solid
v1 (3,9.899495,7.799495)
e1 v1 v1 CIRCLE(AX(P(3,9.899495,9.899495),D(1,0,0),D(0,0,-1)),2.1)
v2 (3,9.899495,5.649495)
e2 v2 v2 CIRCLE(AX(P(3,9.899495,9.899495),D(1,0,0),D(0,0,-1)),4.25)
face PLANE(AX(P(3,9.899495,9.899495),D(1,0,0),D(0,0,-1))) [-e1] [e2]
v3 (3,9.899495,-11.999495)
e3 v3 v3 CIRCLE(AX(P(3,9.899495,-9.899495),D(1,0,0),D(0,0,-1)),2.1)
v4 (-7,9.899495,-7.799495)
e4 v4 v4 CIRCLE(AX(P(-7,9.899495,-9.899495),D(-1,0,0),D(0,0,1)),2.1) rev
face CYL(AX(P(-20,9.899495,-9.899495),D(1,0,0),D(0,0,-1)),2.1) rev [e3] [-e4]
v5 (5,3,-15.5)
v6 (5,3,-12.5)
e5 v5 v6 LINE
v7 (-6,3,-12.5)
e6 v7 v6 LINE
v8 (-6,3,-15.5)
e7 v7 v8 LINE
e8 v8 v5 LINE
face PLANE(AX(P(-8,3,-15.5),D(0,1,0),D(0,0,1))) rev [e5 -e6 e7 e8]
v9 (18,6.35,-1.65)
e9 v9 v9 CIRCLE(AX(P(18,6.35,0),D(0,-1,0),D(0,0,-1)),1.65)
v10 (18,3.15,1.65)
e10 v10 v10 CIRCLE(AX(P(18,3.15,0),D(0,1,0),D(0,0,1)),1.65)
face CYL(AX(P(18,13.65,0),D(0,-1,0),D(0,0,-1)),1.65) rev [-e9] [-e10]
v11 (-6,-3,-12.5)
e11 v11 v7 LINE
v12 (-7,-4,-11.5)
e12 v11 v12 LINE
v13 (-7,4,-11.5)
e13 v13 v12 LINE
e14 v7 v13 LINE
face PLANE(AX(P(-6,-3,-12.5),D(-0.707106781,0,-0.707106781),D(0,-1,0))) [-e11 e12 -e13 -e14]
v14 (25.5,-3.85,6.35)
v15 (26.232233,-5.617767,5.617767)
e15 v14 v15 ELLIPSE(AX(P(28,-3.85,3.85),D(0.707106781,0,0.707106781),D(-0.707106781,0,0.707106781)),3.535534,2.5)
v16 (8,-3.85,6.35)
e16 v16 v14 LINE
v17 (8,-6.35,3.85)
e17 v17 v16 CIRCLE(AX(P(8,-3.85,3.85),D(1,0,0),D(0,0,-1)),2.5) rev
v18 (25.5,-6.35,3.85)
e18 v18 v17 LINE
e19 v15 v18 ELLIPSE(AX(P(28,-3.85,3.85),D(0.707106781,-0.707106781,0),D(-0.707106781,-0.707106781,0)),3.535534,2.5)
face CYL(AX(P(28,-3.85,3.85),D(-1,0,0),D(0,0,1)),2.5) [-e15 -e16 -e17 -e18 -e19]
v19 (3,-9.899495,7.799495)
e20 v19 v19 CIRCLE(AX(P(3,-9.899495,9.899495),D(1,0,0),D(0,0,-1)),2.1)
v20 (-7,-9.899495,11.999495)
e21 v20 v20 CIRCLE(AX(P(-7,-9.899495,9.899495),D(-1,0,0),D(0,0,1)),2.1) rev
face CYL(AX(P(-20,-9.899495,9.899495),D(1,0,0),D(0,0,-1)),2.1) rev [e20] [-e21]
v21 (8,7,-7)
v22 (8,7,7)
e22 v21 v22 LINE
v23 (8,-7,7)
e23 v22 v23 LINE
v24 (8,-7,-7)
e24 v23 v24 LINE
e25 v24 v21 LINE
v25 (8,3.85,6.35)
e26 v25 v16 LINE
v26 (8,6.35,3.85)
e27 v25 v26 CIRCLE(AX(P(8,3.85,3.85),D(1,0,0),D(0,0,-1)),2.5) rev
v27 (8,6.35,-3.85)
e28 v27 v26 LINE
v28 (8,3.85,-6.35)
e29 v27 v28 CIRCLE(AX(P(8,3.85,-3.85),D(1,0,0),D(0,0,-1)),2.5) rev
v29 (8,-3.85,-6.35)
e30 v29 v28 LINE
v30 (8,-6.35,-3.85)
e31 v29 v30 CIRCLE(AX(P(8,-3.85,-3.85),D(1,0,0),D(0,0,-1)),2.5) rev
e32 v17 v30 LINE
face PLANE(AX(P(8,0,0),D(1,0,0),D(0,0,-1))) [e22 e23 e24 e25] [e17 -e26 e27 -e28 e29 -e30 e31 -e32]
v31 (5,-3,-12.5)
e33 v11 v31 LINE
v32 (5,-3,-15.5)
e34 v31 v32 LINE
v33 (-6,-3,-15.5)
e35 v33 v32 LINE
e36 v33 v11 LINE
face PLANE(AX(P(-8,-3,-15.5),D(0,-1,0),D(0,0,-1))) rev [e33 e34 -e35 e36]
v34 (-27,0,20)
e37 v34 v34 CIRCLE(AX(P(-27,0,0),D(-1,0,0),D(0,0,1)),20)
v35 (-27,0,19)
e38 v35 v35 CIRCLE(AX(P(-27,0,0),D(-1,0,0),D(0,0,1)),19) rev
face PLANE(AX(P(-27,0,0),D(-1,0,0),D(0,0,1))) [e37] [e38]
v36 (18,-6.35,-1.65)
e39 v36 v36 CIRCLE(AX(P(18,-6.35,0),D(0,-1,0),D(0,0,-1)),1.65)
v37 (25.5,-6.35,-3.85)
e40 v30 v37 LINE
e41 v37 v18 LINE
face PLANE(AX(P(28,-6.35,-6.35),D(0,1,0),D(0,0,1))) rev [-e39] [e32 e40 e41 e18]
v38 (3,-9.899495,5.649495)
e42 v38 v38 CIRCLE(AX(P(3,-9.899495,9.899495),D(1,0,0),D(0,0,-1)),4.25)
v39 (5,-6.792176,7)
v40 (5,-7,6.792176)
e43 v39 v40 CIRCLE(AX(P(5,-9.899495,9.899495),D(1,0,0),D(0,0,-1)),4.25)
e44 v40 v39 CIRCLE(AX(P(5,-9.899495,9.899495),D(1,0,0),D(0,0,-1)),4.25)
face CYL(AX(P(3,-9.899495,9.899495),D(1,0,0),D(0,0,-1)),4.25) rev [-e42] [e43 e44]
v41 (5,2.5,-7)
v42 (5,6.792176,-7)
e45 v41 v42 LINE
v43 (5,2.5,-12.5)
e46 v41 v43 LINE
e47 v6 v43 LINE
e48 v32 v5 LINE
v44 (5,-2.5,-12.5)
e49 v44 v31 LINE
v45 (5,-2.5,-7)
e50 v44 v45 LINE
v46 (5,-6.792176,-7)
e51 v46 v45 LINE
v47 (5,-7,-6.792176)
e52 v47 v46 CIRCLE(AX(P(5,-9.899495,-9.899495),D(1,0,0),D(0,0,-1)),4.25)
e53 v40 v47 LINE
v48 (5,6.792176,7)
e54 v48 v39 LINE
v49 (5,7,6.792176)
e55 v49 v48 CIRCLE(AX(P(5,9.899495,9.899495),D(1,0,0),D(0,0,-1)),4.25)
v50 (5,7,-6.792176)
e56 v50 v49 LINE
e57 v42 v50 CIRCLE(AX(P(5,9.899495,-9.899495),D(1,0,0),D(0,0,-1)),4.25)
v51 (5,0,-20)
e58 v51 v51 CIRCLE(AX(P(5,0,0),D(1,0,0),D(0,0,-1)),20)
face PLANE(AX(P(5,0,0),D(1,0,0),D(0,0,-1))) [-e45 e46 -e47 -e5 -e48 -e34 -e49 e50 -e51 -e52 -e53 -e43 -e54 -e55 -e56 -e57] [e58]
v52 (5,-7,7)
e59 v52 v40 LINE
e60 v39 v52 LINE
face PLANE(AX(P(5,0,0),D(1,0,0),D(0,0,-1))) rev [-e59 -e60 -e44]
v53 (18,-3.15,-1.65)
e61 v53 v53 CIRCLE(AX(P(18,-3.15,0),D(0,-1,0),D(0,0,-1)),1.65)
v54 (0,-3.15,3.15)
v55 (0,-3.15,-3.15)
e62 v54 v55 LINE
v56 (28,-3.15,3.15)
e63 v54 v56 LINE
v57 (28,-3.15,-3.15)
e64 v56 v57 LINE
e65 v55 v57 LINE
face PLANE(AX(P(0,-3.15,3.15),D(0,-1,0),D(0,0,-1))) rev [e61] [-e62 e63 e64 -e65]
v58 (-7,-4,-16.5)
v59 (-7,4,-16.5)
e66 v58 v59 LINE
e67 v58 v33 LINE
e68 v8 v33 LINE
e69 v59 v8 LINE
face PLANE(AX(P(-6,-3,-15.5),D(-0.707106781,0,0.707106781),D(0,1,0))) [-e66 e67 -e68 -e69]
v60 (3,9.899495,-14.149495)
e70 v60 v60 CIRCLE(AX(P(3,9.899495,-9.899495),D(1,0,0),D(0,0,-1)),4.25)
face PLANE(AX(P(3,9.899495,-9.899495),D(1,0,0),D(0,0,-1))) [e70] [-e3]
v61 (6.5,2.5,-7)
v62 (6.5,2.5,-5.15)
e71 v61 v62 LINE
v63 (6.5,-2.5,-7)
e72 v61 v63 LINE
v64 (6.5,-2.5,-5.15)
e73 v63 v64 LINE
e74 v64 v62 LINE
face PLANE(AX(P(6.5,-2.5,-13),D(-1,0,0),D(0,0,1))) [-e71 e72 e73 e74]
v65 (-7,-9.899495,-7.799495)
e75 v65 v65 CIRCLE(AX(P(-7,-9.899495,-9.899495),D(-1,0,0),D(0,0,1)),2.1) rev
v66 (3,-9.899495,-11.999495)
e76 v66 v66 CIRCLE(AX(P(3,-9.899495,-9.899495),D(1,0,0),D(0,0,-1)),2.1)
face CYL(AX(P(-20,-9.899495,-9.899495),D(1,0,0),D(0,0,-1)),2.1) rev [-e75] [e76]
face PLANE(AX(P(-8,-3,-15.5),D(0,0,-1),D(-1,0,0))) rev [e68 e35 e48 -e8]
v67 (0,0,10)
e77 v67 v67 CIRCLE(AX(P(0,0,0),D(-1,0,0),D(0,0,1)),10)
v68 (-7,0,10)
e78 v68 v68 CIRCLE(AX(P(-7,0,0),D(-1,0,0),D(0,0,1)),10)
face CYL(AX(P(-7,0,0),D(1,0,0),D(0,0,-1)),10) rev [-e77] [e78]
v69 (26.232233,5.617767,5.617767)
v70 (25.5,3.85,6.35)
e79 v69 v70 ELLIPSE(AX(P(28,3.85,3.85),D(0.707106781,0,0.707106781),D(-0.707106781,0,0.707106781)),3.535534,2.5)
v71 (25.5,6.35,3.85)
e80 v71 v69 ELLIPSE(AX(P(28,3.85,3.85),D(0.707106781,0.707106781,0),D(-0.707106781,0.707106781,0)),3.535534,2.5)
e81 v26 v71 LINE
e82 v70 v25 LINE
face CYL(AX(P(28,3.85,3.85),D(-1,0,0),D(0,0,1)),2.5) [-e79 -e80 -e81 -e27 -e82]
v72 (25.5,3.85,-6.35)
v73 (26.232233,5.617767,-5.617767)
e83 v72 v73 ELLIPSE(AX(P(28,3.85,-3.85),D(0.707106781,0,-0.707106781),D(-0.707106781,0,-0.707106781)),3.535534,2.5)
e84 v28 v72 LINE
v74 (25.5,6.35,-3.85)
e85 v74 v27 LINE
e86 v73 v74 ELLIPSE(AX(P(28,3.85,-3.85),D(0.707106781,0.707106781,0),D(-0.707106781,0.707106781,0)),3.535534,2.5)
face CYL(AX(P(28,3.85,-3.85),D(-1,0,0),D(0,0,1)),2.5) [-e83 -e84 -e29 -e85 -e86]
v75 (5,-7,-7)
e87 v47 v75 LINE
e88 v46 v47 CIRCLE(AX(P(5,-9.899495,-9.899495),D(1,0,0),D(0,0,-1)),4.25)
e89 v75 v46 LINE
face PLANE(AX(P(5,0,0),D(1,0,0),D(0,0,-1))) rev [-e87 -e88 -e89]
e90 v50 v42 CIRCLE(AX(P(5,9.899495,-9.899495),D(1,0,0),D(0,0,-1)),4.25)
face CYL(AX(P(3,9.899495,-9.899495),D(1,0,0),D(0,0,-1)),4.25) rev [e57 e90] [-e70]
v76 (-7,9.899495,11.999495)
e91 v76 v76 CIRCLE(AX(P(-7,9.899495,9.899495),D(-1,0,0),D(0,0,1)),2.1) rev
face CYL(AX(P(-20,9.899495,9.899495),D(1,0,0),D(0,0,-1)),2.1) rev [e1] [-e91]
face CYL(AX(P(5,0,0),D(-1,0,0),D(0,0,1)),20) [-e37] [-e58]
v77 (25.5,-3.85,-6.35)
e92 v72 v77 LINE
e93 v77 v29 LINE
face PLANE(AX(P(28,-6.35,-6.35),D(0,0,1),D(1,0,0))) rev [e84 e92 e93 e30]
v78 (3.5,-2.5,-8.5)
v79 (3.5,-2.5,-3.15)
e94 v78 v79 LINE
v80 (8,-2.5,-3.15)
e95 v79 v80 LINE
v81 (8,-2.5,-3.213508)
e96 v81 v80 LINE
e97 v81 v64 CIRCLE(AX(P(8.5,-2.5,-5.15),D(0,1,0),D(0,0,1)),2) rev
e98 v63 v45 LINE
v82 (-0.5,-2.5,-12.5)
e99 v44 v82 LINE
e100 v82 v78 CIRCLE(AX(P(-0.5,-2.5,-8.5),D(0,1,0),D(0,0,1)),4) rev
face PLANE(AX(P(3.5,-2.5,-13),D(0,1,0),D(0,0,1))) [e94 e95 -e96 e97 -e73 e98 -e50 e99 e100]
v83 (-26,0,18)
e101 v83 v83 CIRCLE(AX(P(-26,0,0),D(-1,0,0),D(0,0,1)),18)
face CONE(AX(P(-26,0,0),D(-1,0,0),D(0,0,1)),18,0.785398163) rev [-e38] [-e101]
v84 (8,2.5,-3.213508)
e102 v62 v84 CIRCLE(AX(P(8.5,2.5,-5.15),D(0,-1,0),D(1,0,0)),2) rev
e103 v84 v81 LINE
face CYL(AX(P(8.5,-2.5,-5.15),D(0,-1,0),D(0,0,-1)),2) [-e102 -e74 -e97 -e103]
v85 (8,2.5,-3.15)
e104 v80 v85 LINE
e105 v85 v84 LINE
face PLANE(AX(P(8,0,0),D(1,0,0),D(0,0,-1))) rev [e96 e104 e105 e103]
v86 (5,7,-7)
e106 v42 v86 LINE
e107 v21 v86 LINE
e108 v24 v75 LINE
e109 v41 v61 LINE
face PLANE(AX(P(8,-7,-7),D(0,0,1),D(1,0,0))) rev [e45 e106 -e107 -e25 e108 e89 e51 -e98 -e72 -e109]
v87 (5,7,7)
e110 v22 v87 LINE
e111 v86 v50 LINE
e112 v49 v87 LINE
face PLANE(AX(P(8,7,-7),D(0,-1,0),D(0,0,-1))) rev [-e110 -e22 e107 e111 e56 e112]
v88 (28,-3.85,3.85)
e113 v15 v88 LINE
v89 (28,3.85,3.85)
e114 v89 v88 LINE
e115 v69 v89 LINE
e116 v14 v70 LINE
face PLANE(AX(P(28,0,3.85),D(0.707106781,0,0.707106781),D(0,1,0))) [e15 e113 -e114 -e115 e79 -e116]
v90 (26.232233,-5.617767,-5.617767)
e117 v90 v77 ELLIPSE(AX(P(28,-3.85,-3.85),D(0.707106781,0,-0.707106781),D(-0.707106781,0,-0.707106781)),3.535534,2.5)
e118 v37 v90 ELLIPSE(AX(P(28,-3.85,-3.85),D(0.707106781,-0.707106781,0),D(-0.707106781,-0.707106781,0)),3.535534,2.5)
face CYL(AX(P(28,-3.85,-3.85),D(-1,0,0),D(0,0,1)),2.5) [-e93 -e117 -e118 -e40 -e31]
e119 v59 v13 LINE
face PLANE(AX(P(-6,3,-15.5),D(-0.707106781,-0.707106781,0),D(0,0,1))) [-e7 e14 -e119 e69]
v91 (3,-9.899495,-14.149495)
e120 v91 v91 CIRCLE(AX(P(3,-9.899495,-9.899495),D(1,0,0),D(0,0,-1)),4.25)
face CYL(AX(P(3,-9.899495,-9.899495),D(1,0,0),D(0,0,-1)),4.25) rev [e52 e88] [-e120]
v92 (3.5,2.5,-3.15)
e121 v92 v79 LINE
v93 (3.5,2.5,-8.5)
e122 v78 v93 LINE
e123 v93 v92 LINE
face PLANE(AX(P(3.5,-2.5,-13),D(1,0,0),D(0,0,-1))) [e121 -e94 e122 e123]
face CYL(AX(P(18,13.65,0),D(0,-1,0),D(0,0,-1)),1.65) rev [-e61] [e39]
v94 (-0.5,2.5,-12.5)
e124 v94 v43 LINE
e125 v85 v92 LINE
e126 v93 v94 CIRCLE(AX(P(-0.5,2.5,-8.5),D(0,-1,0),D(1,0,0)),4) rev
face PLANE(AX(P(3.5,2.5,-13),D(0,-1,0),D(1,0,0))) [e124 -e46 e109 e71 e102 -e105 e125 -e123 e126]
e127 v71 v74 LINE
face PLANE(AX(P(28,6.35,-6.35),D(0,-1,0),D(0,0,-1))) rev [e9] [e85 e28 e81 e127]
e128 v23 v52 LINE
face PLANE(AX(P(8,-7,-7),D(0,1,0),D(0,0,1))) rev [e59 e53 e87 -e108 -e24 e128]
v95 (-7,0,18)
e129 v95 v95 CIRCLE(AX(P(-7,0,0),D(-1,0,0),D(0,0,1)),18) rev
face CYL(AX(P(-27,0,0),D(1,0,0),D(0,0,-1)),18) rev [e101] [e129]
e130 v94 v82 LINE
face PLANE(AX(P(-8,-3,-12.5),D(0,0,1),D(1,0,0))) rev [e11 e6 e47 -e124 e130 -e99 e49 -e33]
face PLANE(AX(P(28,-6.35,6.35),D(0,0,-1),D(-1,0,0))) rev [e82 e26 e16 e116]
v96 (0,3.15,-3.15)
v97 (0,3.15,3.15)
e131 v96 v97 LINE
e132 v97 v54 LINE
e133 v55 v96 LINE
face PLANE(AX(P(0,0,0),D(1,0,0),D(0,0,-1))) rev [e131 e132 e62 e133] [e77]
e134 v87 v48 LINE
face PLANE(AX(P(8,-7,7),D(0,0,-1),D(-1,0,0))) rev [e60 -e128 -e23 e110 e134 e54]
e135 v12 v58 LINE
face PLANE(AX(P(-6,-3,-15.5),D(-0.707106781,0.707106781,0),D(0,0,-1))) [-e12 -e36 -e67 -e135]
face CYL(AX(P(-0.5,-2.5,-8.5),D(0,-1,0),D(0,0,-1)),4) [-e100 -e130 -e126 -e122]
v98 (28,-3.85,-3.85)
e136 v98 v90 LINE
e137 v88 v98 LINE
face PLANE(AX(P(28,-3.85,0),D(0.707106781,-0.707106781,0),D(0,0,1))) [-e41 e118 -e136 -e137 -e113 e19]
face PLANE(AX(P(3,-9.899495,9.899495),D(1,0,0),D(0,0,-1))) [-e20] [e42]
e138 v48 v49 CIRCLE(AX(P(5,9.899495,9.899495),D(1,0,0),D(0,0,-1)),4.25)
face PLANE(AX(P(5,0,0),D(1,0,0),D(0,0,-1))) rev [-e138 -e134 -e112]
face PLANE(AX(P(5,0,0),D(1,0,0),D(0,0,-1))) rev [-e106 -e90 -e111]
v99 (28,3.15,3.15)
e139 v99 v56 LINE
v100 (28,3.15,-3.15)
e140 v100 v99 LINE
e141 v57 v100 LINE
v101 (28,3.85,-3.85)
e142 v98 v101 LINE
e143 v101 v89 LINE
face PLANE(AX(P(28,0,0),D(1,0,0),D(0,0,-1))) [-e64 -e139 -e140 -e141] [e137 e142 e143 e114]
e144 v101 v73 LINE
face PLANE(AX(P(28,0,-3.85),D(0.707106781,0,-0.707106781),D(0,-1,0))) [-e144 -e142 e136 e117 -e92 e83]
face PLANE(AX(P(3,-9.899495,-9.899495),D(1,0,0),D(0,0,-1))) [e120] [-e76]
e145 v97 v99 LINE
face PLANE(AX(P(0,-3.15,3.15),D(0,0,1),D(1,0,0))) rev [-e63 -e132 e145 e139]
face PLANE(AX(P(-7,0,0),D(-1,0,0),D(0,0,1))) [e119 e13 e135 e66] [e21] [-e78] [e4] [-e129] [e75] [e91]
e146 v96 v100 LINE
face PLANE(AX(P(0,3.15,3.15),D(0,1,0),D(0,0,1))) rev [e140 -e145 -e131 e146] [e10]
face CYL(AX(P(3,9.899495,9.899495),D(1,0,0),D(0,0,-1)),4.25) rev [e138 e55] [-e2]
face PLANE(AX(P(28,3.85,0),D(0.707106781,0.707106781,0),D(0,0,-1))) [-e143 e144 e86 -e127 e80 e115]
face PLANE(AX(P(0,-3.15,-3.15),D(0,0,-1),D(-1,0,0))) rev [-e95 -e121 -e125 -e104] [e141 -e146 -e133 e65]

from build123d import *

# Parameters (mm, degrees)
SKETCH_1_R               = 20
EXTRUDE_1_DEPTH          = 5
SKETCH_2_W               = 6.3
SKETCH_2_H               = 6.3
CUT_EXTRUDE_1_DEPTH      = 5
EXTRUDE_START            = 7
SKETCH_4_R               = 20
SKETCH_4_R_2             = 10
EXTRUDE_2_DEPTH          = 7
CUT_EXTRUDE_2_DEPTH      = 20
CUT_EXTRUDE_2_DEPTH_BACK = 20
SKETCH_3_R               = 2.1
SKETCH_5_W               = 3
SKETCH_5_H               = 6
CUT_EXTRUDE_3_DEPTH      = 13
CHAMFER_1_SIZE           = 1
EXTRUDE_START_2          = 20
SKETCH_6_R               = 20
SKETCH_6_R_2             = 18
EXTRUDE_3_DEPTH          = 20
CHAMFER_2_SIZE           = 1
SKETCH_7_R               = 4.25
CUT_EXTRUDE_4_DEPTH      = 2
SKETCH_8_W               = 14
SKETCH_8_H               = 14
EXTRUDE_4_DEPTH          = 3
SKETCH_9_W               = 6.3
SKETCH_9_H               = 6.3
CUT_EXTRUDE_5_DEPTH      = 10
CUT_EXTRUDE_6_DEPTH      = 6
CUT_EXTRUDE_6_DEPTH_BACK = 5
SKETCH_10_W              = 3
SKETCH_10_H              = 5
FILLET_1_R               = 4
FILLET_2_R               = 2
SKETCH_11_W              = 12.7
SKETCH_11_H              = 12.7
SKETCH_11_W_2            = 6.3
SKETCH_11_H_2            = 6.3
EXTRUDE_5_DEPTH          = 20
CHAMFER_3_SIZE           = 2.5
SKETCH_12_R              = 1.65
CUT_EXTRUDE_7_DEPTH      = 20
FILLET_3_R               = 2.5


with BuildPart() as part:
    # 草图1 → 凸台-拉伸1 (new body)
    with BuildSketch(Plane(origin=(0, 0, 0), x_dir=(0, 0, -1), z_dir=(1, 0, 0))):
        Circle(SKETCH_1_R)
    extrude(amount=EXTRUDE_1_DEPTH)

    # 草图2 → 切除-拉伸1 (cut)
    with BuildSketch(Plane(origin=(5, 0, 0), x_dir=(0, 0, -1), z_dir=(1, 0, 0))):
        Rectangle(SKETCH_2_W, SKETCH_2_H)
    extrude(amount=-CUT_EXTRUDE_1_DEPTH, mode=Mode.SUBTRACT)

    # 草图4 → 凸台-拉伸2 (add)
    with BuildSketch(Plane.ZY.offset(EXTRUDE_START)):
        Circle(SKETCH_4_R)
        Circle(SKETCH_4_R_2, mode=Mode.SUBTRACT)
    extrude(amount=-EXTRUDE_2_DEPTH)

    # 草图3 → 切除-拉伸2 (cut, two sides: drawn at the far end of the back side and taken through both)
    with BuildSketch(Plane.ZY.offset(-CUT_EXTRUDE_2_DEPTH_BACK)):
        with Locations(Location((9.899494937, -9.899494937, 0), (0, 0, 180))):
            Circle(SKETCH_3_R)
        with Locations(Location((-9.899494937, -9.899494937, 0), (0, 0, 180))):
            Circle(SKETCH_3_R)
        with Locations(Location((-9.899494937, 9.899494937, 0), (0, 0, 180))):
            Circle(SKETCH_3_R)
        with Locations(Location((9.899494937, 9.899494937, 0), (0, 0, 180))):
            Circle(SKETCH_3_R)
    extrude(amount=CUT_EXTRUDE_2_DEPTH + CUT_EXTRUDE_2_DEPTH_BACK, mode=Mode.SUBTRACT)

    # 草图5 → 切除-拉伸3 (cut)
    with BuildSketch(Plane(origin=(5, 0, 0), x_dir=(0, 0, -1), z_dir=(1, 0, 0))):
        with Locations((14, 0)):
            Rectangle(SKETCH_5_W, SKETCH_5_H)
    extrude(amount=-CUT_EXTRUDE_3_DEPTH, mode=Mode.SUBTRACT)

    # 倒角1
    chamfer_1_edges = [part.edges().sort_by_distance(p)[0] for p in [
        (-7, -3, -14),
        (-7, 0, -15.5),
        (-7, 3, -14),
        (-7, 0, -12.5),
    ]]
    chamfer(chamfer_1_edges, length=CHAMFER_1_SIZE)

    # 草图6 → 凸台-拉伸3 (add)
    with BuildSketch(Plane.ZY.offset(7).offset(EXTRUDE_START_2)):
        Circle(SKETCH_6_R)
        Circle(SKETCH_6_R_2, mode=Mode.SUBTRACT)
    extrude(amount=-EXTRUDE_3_DEPTH)

    # 倒角2
    chamfer_2_edges = [part.edges().sort_by_distance(p)[0] for p in [
        (-27, 0, -18),
    ]]
    chamfer(chamfer_2_edges, length=CHAMFER_2_SIZE)

    # 草图7 → 切除-拉伸4 (cut)
    with BuildSketch(Plane(origin=(5, 0, 0), x_dir=(0, 0, -1), z_dir=(1, 0, 0))):
        with Locations((-9.899494937, 9.899494937)):
            Circle(SKETCH_7_R)
        with Locations((9.899494937, 9.899494937)):
            Circle(SKETCH_7_R)
        with Locations((9.899494937, -9.899494937)):
            Circle(SKETCH_7_R)
        with Locations((-9.899494937, -9.899494937)):
            Circle(SKETCH_7_R)
    extrude(amount=-CUT_EXTRUDE_4_DEPTH, mode=Mode.SUBTRACT)

    # 草图8 → 凸台-拉伸4 (add)
    with BuildSketch(Plane(origin=(5, 0, 0), x_dir=(0, 0, -1), z_dir=(1, 0, 0))):
        Rectangle(SKETCH_8_W, SKETCH_8_H)
    extrude(amount=EXTRUDE_4_DEPTH)

    # 草图9 → 切除-拉伸5 (cut)
    with BuildSketch(Plane.ZY.offset(-5)):
        Rectangle(SKETCH_9_W, SKETCH_9_H)
    extrude(amount=-CUT_EXTRUDE_5_DEPTH, mode=Mode.SUBTRACT)

    # 草图10 → 切除-拉伸6 (cut, two sides: drawn at the far end of the back side and taken through both)
    with BuildSketch(Plane(origin=(0, 0, -7), x_dir=(-1, 0, 0), z_dir=(0, 0, -1)).offset(-CUT_EXTRUDE_6_DEPTH_BACK)):
        with Locations((-5, 0)):
            Rectangle(SKETCH_10_W, SKETCH_10_H)
    extrude(amount=CUT_EXTRUDE_6_DEPTH + CUT_EXTRUDE_6_DEPTH_BACK, mode=Mode.SUBTRACT)

    # 圆角1
    fillet_1_edges = [part.edges().sort_by_distance(p)[0] for p in [
        (3.5, 0, -12.5),
    ]]
    fillet(fillet_1_edges, radius=FILLET_1_R)

    # 圆角2
    # the kernel refuses this fillet: 2 mm, written as the material it takes off along each edge
    with BuildSketch(Plane(origin=(6.5, 2.5, -3.15), x_dir=(1, 0, 0), z_dir=(0, -1, 0))) as fillet_2_piece_1:
        with BuildLine():
            CenterArc((FILLET_2_R, -FILLET_2_R), FILLET_2_R, 90, 90)
            Line((0, -FILLET_2_R), (0, 0))
            Line((0, 0), (FILLET_2_R, 0))
        make_face()
    extrude(amount=5, mode=Mode.SUBTRACT)

    # 草图11 → 凸台-拉伸5 (add)
    with BuildSketch(Plane(origin=(8, 0, 0), x_dir=(0, 0, -1), z_dir=(1, 0, 0))):
        Rectangle(SKETCH_11_W, SKETCH_11_H)
        Rectangle(SKETCH_11_W_2, SKETCH_11_H_2, mode=Mode.SUBTRACT)
    extrude(amount=EXTRUDE_5_DEPTH)

    # 倒角3
    chamfer_3_edges = [part.edges().sort_by_distance(p)[0] for p in [
        (28, 0, 6.35),
        (28, -6.35, 0),
        (28, 0, -6.35),
        (28, 6.35, 0),
    ]]
    chamfer(chamfer_3_edges, length=CHAMFER_3_SIZE)

    # 草图12 → 切除-拉伸7 (cut)
    with BuildSketch(Plane.XZ.offset(6.35)):
        with Locations(Location((18, 0, 0), (0, 0, 270))):
            Circle(SKETCH_12_R)
    extrude(amount=-CUT_EXTRUDE_7_DEPTH, mode=Mode.SUBTRACT)

    # 圆角3
    fillet_3_edges = [part.edges().sort_by_distance(p)[0] for p in [
        (16.75, 6.35, 6.35),
        (16.75, 6.35, -6.35),
        (16.75, -6.35, -6.35),
        (16.75, -6.35, 6.35),
    ]]
    fillet(fillet_3_edges, radius=FILLET_3_R)


solid = part.part
